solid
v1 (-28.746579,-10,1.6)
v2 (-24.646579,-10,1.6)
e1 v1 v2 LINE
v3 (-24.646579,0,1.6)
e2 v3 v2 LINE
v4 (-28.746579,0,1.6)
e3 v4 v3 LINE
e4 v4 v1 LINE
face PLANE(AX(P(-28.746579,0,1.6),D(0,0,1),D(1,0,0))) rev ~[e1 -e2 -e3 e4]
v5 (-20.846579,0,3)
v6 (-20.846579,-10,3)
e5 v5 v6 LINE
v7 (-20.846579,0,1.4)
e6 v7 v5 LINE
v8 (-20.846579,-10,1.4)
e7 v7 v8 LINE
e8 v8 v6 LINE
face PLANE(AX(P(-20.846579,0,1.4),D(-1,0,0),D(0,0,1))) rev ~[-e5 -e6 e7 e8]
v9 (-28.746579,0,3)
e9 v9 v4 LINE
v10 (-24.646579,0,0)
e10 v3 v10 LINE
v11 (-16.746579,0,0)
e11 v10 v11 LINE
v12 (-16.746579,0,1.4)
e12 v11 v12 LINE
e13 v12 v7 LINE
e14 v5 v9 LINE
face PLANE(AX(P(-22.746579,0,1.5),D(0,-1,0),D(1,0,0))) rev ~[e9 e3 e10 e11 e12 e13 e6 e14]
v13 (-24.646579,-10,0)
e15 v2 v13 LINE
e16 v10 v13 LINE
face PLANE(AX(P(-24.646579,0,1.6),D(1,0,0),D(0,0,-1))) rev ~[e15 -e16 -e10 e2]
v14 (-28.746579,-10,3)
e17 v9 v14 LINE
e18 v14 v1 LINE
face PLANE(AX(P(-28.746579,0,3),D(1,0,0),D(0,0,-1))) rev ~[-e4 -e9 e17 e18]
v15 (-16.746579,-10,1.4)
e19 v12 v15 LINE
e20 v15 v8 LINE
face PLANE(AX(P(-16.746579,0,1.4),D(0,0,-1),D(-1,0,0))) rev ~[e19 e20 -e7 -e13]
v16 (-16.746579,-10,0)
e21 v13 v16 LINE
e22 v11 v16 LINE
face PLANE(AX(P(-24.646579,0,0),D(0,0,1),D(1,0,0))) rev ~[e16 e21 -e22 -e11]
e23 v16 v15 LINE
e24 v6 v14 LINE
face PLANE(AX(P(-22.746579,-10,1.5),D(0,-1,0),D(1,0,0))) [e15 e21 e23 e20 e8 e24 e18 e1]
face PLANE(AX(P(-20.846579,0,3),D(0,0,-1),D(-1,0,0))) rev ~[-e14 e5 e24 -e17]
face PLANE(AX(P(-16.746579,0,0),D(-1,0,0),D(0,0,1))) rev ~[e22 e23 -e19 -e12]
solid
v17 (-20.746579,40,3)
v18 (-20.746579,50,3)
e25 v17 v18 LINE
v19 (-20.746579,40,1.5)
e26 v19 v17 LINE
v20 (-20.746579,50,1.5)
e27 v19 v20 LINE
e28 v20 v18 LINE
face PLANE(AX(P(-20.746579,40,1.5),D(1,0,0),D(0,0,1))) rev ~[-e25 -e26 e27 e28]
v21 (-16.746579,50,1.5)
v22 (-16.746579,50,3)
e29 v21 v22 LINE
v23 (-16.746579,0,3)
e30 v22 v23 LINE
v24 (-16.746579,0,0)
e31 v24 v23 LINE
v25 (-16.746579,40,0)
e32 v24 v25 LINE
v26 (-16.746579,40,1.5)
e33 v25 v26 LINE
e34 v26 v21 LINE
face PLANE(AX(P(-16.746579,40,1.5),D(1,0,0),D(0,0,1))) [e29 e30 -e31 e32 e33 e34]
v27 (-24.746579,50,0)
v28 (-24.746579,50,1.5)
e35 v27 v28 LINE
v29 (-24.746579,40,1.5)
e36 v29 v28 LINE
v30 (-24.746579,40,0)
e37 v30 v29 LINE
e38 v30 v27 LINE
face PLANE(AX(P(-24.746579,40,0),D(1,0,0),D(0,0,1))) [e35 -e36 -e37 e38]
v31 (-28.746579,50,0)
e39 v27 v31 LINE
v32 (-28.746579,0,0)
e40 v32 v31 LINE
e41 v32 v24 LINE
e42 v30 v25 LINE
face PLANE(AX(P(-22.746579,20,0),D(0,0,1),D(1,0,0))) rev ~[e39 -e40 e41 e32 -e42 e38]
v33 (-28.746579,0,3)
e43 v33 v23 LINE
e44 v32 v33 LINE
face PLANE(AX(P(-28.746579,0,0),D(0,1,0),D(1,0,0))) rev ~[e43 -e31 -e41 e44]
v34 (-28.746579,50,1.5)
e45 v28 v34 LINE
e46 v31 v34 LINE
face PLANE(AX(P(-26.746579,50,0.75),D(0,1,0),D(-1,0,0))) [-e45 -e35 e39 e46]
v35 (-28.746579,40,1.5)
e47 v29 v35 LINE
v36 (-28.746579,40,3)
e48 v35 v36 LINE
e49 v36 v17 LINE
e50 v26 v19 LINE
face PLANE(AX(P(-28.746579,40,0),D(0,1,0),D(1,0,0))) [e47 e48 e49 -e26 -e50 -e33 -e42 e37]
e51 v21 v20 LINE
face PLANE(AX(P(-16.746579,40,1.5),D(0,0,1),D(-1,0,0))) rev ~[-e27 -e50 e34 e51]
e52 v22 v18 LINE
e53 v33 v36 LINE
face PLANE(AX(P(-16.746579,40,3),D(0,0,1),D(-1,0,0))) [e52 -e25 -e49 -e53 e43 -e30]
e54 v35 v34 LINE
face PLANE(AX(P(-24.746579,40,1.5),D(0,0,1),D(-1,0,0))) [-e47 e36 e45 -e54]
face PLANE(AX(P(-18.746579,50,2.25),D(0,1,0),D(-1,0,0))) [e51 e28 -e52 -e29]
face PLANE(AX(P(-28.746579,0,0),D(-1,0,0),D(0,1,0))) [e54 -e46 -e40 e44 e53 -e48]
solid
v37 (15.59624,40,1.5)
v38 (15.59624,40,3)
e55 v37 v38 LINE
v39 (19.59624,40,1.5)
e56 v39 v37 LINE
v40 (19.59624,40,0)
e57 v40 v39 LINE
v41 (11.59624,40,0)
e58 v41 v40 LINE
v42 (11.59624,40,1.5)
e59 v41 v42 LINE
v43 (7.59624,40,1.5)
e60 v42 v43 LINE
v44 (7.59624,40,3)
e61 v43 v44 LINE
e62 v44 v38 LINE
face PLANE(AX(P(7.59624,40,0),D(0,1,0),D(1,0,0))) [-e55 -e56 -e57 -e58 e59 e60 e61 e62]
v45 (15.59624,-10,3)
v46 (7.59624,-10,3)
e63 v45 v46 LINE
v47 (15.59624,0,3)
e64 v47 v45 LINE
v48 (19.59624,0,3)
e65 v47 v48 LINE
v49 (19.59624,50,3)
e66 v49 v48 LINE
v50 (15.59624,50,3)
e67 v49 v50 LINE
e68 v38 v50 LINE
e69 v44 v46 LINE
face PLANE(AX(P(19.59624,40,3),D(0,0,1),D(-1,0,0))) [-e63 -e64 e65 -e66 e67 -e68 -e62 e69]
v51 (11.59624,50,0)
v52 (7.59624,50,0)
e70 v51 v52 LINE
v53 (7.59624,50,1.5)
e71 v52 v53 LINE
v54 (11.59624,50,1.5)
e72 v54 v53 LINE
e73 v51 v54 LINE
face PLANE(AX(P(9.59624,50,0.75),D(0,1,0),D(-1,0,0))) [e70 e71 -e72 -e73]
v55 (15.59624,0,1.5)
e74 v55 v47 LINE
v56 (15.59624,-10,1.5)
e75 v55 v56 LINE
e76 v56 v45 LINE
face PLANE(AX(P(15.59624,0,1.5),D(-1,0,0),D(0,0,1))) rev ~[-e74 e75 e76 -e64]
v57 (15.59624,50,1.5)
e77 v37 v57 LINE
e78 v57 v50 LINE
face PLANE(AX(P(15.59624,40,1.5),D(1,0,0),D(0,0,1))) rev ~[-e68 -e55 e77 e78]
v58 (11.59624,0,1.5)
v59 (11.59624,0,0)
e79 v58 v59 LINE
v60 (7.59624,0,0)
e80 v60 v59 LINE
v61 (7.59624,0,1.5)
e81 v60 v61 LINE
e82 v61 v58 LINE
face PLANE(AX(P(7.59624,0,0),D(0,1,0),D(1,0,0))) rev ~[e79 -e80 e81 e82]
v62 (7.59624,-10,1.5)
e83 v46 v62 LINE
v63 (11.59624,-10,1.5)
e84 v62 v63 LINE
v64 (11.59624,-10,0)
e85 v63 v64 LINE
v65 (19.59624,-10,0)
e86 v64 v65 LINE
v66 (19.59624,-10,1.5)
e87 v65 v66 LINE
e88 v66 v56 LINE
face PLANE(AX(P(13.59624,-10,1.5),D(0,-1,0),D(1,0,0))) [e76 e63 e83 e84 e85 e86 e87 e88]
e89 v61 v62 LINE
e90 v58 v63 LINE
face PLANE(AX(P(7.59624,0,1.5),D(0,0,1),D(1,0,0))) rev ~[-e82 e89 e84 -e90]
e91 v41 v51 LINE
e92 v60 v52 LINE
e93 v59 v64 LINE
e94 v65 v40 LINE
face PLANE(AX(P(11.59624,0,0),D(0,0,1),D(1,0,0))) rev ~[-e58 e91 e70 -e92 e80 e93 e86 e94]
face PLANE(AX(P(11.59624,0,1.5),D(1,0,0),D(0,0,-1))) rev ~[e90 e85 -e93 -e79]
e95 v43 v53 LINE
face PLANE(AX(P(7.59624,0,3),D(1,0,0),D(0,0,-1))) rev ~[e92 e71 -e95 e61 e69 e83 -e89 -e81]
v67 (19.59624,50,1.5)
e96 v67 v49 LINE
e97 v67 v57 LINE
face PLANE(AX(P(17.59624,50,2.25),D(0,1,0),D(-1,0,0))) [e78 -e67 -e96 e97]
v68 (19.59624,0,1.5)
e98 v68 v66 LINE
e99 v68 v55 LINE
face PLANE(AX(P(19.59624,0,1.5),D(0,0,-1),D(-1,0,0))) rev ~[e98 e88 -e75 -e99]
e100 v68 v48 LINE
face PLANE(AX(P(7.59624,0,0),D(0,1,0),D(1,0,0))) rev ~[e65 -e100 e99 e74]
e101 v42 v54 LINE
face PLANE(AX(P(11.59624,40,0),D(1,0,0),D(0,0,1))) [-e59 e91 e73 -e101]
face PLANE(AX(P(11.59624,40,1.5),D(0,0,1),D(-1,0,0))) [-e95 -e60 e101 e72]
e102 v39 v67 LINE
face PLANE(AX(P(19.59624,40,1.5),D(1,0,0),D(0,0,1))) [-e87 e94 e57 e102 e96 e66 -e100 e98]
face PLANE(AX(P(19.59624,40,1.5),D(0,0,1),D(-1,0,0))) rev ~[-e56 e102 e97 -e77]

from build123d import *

# Parameters (mm, degrees)
F0_W     = 12
F0_H     = 40
F1_DEPTH = 3
F4_DEPTH = 10
F6_W     = 4
F6_H     = 1.5
F7_DEPTH = 10
F5_W     = 4
F5_H     = 1.5


# Not quite as in the source:
# - a feature names something its author has since deleted; it is built from what else it names


with BuildPart() as f1:
    # F0 (on Top) → F1 (new body)
    with BuildSketch(Plane.XY):
        with Locations((-22.7465788424, 20)):
            Rectangle(F0_W, F0_H)
    extrude(amount=F1_DEPTH)

    # F6 (on face) → F7 (join)
    with BuildSketch(Plane(origin=(0, 40, 0), x_dir=(-1, 0, 0), z_dir=(0, 1, 0))):
        with Locations((18.7465788424, 2.25)):
            Rectangle(F6_W, F6_H)
        with Locations((26.7465788424, 0.75)):
            Rectangle(F6_W, F6_H)
    extrude(amount=F7_DEPTH)


with BuildPart() as f1b:
    # F0 (on Top) → F1, piece 2 (new body)
    with BuildSketch(Plane.XY):
        with Locations((13.5962403789, 20)):
            Rectangle(F0_W, F0_H)
    extrude(amount=F1_DEPTH)

    # F3 (on face) → F4 (join)
    with BuildSketch(Plane.XZ):
        Polygon((15.5962403789, 3), (7.5962403789, 3), (7.5962403789, 1.5), (11.5962403789, 1.5), (11.5962403789, 0), (19.5962403789, 0), (19.5962403789, 1.5), (15.5962403789, 1.5), align=None)
    extrude(amount=F4_DEPTH)

    # F5 (on face) → F7, piece 2 (join)
    with BuildSketch(Plane(origin=(0, 40, 0), x_dir=(-1, 0, 0), z_dir=(0, 1, 0))):
        with Locations((-17.5962403789, 2.25)):
            Rectangle(F5_W, F5_H)
        with Locations((-9.5962403789, 0.75)):
            Rectangle(F5_W, F5_H)
    extrude(amount=F7_DEPTH)


with BuildPart() as f4:
    # F2 (on face) → F4, piece 2 (new body)
    with BuildSketch(Plane.XZ):
        Polygon((-20.8465788424, 3), (-28.7465788424, 3), (-28.7465788424, 1.6), (-24.6465788424, 1.6), (-24.6465788424, 0), (-16.7465788424, 0), (-16.7465788424, 1.4), (-20.8465788424, 1.4), align=None)
    extrude(amount=F4_DEPTH)


solid = Compound([f1.part, f1b.part, f4.part])
